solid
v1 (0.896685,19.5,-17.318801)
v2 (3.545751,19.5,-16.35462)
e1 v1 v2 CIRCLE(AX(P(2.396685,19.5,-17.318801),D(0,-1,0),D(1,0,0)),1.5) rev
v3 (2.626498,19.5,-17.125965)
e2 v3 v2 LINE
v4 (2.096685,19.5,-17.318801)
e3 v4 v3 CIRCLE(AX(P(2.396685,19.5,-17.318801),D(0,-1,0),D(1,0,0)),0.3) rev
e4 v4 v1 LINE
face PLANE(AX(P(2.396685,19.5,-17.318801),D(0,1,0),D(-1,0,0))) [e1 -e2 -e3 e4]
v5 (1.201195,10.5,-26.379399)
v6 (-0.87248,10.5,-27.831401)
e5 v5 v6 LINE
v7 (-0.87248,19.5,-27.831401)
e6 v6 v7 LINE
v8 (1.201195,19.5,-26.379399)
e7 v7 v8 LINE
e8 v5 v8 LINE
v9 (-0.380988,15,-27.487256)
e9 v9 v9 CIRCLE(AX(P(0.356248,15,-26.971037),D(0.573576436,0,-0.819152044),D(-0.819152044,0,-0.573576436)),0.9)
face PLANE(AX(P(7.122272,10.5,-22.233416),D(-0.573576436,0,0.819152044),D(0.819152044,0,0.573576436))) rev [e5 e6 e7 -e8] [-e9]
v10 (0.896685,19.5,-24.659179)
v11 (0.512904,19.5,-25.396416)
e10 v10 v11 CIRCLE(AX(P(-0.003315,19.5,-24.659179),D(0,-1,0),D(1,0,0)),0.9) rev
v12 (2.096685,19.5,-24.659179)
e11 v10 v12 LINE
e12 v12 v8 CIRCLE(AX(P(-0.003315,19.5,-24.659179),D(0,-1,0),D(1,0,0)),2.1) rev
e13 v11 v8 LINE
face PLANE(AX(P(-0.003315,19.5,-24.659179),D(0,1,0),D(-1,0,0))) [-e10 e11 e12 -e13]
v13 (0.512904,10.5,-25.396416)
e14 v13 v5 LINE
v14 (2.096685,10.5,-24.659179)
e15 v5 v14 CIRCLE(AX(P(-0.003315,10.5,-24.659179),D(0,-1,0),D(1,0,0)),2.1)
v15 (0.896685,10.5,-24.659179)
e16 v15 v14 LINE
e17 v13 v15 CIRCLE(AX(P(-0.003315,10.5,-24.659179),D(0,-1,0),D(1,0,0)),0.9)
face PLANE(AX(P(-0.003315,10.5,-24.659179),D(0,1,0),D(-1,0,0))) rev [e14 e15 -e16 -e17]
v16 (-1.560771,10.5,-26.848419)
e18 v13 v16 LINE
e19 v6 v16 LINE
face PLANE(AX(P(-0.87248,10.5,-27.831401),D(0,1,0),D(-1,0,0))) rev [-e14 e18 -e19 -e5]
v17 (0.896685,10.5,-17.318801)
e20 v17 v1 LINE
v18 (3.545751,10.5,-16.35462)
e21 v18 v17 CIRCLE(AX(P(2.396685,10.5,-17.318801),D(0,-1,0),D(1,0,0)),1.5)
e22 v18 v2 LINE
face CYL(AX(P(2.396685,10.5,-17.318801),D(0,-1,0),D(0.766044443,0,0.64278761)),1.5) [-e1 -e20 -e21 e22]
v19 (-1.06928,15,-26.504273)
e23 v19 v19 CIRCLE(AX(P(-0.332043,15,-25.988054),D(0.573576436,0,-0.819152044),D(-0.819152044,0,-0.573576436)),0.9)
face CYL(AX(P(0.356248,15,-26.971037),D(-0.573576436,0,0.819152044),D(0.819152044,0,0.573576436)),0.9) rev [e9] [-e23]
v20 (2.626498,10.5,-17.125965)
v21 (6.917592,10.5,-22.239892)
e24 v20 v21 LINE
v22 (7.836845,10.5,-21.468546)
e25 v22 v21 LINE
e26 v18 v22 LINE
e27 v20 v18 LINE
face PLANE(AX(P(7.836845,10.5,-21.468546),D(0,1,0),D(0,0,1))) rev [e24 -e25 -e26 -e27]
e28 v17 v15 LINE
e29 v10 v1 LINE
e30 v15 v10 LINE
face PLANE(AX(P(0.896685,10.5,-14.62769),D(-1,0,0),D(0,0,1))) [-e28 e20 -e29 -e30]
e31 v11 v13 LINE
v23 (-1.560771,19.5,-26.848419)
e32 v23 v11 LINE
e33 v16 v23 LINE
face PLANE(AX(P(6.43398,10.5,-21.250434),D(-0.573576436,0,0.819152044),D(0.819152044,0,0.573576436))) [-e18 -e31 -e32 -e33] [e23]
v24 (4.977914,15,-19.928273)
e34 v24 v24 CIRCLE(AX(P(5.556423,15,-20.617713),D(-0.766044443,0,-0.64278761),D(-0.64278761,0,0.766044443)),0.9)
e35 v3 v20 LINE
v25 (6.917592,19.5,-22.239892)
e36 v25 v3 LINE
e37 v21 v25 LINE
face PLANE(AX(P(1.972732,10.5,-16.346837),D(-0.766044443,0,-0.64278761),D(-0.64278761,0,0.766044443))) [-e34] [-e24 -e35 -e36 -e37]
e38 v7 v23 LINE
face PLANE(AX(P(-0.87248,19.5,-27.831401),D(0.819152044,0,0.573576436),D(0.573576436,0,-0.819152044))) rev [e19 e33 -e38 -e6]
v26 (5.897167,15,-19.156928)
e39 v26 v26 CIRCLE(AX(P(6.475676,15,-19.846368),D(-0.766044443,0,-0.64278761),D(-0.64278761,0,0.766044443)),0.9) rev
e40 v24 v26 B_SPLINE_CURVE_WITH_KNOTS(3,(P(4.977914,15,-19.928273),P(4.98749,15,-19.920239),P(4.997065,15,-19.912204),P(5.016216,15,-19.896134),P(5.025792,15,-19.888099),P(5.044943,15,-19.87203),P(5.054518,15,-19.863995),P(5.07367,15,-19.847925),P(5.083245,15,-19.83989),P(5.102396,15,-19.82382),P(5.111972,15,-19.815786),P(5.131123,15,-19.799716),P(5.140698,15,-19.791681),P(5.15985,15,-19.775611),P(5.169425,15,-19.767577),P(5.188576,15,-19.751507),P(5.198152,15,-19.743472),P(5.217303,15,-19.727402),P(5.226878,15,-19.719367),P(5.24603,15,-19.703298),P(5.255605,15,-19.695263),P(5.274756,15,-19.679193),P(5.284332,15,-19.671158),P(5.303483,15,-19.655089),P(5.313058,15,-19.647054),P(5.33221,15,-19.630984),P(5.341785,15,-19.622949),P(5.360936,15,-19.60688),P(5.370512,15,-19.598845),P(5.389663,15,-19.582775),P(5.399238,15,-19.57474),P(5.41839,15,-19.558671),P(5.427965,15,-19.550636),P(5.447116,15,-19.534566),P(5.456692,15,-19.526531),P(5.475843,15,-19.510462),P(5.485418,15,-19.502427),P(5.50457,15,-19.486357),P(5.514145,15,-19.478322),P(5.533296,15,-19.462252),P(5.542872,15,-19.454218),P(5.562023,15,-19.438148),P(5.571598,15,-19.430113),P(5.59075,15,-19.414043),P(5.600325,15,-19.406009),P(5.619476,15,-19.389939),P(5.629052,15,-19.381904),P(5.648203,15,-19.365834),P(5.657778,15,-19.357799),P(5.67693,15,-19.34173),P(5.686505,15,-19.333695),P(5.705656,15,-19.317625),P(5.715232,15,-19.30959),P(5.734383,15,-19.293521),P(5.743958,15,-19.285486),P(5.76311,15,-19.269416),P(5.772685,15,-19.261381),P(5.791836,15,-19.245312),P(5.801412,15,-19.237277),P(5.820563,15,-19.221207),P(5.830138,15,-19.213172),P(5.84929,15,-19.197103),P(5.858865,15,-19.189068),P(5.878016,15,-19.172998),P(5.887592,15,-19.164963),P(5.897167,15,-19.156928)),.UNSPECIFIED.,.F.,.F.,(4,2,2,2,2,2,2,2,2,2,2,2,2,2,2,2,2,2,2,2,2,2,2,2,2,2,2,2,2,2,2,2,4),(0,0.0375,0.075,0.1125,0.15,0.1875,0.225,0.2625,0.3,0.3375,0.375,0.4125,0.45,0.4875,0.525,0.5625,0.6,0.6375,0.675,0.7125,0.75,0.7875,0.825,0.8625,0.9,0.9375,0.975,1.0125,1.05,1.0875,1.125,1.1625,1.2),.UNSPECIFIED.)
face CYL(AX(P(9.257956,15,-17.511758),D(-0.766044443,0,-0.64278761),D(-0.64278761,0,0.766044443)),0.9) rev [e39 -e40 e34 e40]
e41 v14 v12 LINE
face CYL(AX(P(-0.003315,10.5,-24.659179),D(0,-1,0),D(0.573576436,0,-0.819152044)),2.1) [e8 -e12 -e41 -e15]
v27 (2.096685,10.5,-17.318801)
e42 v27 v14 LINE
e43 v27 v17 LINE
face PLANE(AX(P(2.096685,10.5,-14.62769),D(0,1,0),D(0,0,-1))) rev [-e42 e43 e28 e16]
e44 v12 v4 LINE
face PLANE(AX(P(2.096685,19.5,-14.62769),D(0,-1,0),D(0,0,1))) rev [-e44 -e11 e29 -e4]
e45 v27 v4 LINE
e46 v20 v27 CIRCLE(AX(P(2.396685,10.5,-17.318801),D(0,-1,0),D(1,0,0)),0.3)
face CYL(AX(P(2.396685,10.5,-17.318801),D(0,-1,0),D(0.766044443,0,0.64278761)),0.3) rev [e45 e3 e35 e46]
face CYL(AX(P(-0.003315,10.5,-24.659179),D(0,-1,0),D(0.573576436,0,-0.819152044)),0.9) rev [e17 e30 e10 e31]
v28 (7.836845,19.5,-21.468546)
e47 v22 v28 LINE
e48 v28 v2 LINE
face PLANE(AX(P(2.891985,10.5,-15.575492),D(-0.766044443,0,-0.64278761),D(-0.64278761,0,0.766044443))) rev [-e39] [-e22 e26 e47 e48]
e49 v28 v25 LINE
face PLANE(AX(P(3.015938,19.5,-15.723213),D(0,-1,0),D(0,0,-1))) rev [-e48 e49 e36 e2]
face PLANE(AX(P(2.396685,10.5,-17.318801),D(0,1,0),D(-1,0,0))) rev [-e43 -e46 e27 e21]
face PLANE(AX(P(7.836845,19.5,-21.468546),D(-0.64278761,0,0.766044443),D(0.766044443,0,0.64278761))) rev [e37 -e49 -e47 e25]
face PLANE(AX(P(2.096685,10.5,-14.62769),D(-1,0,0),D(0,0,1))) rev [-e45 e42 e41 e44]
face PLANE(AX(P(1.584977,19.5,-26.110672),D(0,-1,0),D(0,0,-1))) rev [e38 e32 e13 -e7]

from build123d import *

# Parameters (mm, degrees)
SKETCH_2_W                       = 35
SKETCH_2_H                       = 30
EXTRUDE_1_DEPTH                  = 1
SHEET_START                      = -35
SHEET_METAL_1_OUTLINE_W          = 3
SHEET_METAL_1_OUTLINE_H          = 30
SHEET_METAL_1_DEPTH              = 35
SM_EDGE_FLANGE_1_DEPTH           = 30
SM_EDGE_FLANGE_1_2_DEPTH         = 30
SM_EDGE_FLANGE_2_STRIP_CUT_DEPTH = 30
SM_EDGE_FLANGE_2_DEPTH           = 30
SM_START                         = 4
SM_EDGE_FLANGE_2_PROFILE_W       = 30
SM_EDGE_FLANGE_2_PROFILE_H       = 8.438298848
SM_EDGE_FLANGE_2_PROFILE_R       = 3
SM_EDGE_FLANGE_2_FLAT_DEPTH      = 4
CUT_EXTRUDE_1_REACH              = 58.3
SKETCH_20_R                      = 3
SCALE_1_SCALE                    = 0.3


# Read off the part's stored shape, not the designer's step: 转换实体1, 边线-法兰1
# Sheet-metal steps are written as plain solids
with BuildPart() as part:
    # Sketch 2 → 凸台-拉伸1 (new body)
    with BuildSketch(Plane(origin=(0, 0, 0), x_dir=(0, 0, -1), z_dir=(1, 0, 0))):
        with Locations((17.5, 15)):
            Rectangle(SKETCH_2_W, SKETCH_2_H)
    extrude(amount=EXTRUDE_1_DEPTH)

    # Sheet Metal 1 outline → Sheet Metal 1 (add)
    with BuildSketch(Plane.XY.offset(SHEET_START)):
        with Locations((-1.5, 15)):
            Rectangle(SHEET_METAL_1_OUTLINE_W, SHEET_METAL_1_OUTLINE_H)
    extrude(amount=SHEET_METAL_1_DEPTH)

    # 边线-法兰1 outline → 边线-法兰1 (cut)
    with BuildSketch(Plane(origin=(0, 0, 0), x_dir=(1, 0, 0), z_dir=(0, 1, 0))):
        with BuildLine():
            Line((1, 0), (1, 4.071393241))
            ThreePointArc((1, 4.071393241), (-1.872983346, 5.808095067), (-3, 8.970372727))
            Line((-3, 8.970372727), (-3, 0))
            Line((-3, 0), (1, 0))
        make_face()
    extrude(amount=SM_EDGE_FLANGE_1_DEPTH, mode=Mode.SUBTRACT)

    # Sm Edge Flange 1 2 outline → Sm Edge Flange 1 2 (add)
    with BuildSketch(Plane(origin=(0, 0, 0), x_dir=(1, 0, 0), z_dir=(0, 1, 0))):
        with BuildLine():
            ThreePointArc((1, 4.071393241), (3.646930663, 4.249396197), (5.830222216, 5.756434678))
            Line((5.830222216, 5.756434678), (20.133868015, 22.802855947))
            Line((20.133868015, 22.802855947), (17.069690242, 25.374006385))
            Line((17.069690242, 25.374006385), (2.766044443, 8.327585117))
            ThreePointArc((2.766044443, 8.327585117), (1.657979857, 8.030680106), (1, 8.970372727))
            Line((1, 8.970372727), (1, 4.071393241))
        make_face()
    extrude(amount=SM_EDGE_FLANGE_1_2_DEPTH)

    # 边线-法兰2 strip (across the edge) → 边线-法兰2 strip cut (cut)
    with BuildSketch(Plane(origin=(-3, 30, -35), x_dir=(-0.5735764363510502, 0, 0.8191520442889889), z_dir=(0, -1, 0))):
        Polygon((-19.036380029, 8.446318441), (-1.015035054, -4.172363158), (1.279270691, -0.895754981), (-16.742074283, 11.722926619), align=None)
    extrude(amount=SM_EDGE_FLANGE_2_STRIP_CUT_DEPTH, mode=Mode.SUBTRACT)

    # 边线-法兰2 bend section (across the edge) → 边线-法兰2 (add)
    with BuildSketch(Plane(origin=(-3, 30, -35), x_dir=(-0.5735764363510502, 0, 0.8191520442889889), z_dir=(0, -1, 0))):
        with BuildLine():
            Line((-4, 1.561701152), (0, 1.561701152))
            ThreePointArc((0, 1.561701152), (0.3389675, 0.176455312), (1.279270691, -0.895754981))
            Line((1.279270691, -0.895754981), (-1.015035054, -4.172363158))
            ThreePointArc((-1.015035054, -4.172363158), (-3.209075832, -1.670539141), (-4, 1.561701152))
        make_face()
    extrude(amount=SM_EDGE_FLANGE_2_DEPTH)

    # 边线-法兰2 profile (on flange) → 边线-法兰2 flat (add)
    with BuildSketch(Plane(origin=(-3, 0, -35), x_dir=(0, -1, 0), z_dir=(0.5735764363510502, 0, -0.8191520442889889)).offset(SM_START)):
        with Locations((-15, 5.780850576)):
            Rectangle(SM_EDGE_FLANGE_2_PROFILE_W, SM_EDGE_FLANGE_2_PROFILE_H)
        with Locations((-15, 5)):
            Circle(SM_EDGE_FLANGE_2_PROFILE_R, mode=Mode.SUBTRACT)
    extrude(amount=-SM_EDGE_FLANGE_2_FLAT_DEPTH)

    # 草图20 → 切除-拉伸1 (cut, up to next)
    with BuildSketch(Plane(origin=(-2.477353684, 0, -2.078746562), x_dir=(-0.6427876096865404, 0, 0.7660444431189772), z_dir=(-0.7660444431189772, 0, -0.6427876096865404)), mode=Mode.PRIVATE) as cut_extrude_1_sk1:
        with Locations((-23.351124779, 15)):
            Circle(SKETCH_20_R)
    cut_extrude_1_tool1 = extrude(cut_extrude_1_sk1.sketch, amount=-CUT_EXTRUDE_1_REACH, mode=Mode.PRIVATE) & part.part
    add(cut_extrude_1_tool1.solids().sort_by_distance((12.53246, 15, -19.966746))[0], mode=Mode.SUBTRACT)


with BuildPart() as part_1:
    # 缩放比例1: scaled about (2.566692586, 15, -20.896699523)
    add(part.part.scale(SCALE_1_SCALE).moved(Location((1.79668481, 10.5, -14.627689666))))


solid = part_1.part
